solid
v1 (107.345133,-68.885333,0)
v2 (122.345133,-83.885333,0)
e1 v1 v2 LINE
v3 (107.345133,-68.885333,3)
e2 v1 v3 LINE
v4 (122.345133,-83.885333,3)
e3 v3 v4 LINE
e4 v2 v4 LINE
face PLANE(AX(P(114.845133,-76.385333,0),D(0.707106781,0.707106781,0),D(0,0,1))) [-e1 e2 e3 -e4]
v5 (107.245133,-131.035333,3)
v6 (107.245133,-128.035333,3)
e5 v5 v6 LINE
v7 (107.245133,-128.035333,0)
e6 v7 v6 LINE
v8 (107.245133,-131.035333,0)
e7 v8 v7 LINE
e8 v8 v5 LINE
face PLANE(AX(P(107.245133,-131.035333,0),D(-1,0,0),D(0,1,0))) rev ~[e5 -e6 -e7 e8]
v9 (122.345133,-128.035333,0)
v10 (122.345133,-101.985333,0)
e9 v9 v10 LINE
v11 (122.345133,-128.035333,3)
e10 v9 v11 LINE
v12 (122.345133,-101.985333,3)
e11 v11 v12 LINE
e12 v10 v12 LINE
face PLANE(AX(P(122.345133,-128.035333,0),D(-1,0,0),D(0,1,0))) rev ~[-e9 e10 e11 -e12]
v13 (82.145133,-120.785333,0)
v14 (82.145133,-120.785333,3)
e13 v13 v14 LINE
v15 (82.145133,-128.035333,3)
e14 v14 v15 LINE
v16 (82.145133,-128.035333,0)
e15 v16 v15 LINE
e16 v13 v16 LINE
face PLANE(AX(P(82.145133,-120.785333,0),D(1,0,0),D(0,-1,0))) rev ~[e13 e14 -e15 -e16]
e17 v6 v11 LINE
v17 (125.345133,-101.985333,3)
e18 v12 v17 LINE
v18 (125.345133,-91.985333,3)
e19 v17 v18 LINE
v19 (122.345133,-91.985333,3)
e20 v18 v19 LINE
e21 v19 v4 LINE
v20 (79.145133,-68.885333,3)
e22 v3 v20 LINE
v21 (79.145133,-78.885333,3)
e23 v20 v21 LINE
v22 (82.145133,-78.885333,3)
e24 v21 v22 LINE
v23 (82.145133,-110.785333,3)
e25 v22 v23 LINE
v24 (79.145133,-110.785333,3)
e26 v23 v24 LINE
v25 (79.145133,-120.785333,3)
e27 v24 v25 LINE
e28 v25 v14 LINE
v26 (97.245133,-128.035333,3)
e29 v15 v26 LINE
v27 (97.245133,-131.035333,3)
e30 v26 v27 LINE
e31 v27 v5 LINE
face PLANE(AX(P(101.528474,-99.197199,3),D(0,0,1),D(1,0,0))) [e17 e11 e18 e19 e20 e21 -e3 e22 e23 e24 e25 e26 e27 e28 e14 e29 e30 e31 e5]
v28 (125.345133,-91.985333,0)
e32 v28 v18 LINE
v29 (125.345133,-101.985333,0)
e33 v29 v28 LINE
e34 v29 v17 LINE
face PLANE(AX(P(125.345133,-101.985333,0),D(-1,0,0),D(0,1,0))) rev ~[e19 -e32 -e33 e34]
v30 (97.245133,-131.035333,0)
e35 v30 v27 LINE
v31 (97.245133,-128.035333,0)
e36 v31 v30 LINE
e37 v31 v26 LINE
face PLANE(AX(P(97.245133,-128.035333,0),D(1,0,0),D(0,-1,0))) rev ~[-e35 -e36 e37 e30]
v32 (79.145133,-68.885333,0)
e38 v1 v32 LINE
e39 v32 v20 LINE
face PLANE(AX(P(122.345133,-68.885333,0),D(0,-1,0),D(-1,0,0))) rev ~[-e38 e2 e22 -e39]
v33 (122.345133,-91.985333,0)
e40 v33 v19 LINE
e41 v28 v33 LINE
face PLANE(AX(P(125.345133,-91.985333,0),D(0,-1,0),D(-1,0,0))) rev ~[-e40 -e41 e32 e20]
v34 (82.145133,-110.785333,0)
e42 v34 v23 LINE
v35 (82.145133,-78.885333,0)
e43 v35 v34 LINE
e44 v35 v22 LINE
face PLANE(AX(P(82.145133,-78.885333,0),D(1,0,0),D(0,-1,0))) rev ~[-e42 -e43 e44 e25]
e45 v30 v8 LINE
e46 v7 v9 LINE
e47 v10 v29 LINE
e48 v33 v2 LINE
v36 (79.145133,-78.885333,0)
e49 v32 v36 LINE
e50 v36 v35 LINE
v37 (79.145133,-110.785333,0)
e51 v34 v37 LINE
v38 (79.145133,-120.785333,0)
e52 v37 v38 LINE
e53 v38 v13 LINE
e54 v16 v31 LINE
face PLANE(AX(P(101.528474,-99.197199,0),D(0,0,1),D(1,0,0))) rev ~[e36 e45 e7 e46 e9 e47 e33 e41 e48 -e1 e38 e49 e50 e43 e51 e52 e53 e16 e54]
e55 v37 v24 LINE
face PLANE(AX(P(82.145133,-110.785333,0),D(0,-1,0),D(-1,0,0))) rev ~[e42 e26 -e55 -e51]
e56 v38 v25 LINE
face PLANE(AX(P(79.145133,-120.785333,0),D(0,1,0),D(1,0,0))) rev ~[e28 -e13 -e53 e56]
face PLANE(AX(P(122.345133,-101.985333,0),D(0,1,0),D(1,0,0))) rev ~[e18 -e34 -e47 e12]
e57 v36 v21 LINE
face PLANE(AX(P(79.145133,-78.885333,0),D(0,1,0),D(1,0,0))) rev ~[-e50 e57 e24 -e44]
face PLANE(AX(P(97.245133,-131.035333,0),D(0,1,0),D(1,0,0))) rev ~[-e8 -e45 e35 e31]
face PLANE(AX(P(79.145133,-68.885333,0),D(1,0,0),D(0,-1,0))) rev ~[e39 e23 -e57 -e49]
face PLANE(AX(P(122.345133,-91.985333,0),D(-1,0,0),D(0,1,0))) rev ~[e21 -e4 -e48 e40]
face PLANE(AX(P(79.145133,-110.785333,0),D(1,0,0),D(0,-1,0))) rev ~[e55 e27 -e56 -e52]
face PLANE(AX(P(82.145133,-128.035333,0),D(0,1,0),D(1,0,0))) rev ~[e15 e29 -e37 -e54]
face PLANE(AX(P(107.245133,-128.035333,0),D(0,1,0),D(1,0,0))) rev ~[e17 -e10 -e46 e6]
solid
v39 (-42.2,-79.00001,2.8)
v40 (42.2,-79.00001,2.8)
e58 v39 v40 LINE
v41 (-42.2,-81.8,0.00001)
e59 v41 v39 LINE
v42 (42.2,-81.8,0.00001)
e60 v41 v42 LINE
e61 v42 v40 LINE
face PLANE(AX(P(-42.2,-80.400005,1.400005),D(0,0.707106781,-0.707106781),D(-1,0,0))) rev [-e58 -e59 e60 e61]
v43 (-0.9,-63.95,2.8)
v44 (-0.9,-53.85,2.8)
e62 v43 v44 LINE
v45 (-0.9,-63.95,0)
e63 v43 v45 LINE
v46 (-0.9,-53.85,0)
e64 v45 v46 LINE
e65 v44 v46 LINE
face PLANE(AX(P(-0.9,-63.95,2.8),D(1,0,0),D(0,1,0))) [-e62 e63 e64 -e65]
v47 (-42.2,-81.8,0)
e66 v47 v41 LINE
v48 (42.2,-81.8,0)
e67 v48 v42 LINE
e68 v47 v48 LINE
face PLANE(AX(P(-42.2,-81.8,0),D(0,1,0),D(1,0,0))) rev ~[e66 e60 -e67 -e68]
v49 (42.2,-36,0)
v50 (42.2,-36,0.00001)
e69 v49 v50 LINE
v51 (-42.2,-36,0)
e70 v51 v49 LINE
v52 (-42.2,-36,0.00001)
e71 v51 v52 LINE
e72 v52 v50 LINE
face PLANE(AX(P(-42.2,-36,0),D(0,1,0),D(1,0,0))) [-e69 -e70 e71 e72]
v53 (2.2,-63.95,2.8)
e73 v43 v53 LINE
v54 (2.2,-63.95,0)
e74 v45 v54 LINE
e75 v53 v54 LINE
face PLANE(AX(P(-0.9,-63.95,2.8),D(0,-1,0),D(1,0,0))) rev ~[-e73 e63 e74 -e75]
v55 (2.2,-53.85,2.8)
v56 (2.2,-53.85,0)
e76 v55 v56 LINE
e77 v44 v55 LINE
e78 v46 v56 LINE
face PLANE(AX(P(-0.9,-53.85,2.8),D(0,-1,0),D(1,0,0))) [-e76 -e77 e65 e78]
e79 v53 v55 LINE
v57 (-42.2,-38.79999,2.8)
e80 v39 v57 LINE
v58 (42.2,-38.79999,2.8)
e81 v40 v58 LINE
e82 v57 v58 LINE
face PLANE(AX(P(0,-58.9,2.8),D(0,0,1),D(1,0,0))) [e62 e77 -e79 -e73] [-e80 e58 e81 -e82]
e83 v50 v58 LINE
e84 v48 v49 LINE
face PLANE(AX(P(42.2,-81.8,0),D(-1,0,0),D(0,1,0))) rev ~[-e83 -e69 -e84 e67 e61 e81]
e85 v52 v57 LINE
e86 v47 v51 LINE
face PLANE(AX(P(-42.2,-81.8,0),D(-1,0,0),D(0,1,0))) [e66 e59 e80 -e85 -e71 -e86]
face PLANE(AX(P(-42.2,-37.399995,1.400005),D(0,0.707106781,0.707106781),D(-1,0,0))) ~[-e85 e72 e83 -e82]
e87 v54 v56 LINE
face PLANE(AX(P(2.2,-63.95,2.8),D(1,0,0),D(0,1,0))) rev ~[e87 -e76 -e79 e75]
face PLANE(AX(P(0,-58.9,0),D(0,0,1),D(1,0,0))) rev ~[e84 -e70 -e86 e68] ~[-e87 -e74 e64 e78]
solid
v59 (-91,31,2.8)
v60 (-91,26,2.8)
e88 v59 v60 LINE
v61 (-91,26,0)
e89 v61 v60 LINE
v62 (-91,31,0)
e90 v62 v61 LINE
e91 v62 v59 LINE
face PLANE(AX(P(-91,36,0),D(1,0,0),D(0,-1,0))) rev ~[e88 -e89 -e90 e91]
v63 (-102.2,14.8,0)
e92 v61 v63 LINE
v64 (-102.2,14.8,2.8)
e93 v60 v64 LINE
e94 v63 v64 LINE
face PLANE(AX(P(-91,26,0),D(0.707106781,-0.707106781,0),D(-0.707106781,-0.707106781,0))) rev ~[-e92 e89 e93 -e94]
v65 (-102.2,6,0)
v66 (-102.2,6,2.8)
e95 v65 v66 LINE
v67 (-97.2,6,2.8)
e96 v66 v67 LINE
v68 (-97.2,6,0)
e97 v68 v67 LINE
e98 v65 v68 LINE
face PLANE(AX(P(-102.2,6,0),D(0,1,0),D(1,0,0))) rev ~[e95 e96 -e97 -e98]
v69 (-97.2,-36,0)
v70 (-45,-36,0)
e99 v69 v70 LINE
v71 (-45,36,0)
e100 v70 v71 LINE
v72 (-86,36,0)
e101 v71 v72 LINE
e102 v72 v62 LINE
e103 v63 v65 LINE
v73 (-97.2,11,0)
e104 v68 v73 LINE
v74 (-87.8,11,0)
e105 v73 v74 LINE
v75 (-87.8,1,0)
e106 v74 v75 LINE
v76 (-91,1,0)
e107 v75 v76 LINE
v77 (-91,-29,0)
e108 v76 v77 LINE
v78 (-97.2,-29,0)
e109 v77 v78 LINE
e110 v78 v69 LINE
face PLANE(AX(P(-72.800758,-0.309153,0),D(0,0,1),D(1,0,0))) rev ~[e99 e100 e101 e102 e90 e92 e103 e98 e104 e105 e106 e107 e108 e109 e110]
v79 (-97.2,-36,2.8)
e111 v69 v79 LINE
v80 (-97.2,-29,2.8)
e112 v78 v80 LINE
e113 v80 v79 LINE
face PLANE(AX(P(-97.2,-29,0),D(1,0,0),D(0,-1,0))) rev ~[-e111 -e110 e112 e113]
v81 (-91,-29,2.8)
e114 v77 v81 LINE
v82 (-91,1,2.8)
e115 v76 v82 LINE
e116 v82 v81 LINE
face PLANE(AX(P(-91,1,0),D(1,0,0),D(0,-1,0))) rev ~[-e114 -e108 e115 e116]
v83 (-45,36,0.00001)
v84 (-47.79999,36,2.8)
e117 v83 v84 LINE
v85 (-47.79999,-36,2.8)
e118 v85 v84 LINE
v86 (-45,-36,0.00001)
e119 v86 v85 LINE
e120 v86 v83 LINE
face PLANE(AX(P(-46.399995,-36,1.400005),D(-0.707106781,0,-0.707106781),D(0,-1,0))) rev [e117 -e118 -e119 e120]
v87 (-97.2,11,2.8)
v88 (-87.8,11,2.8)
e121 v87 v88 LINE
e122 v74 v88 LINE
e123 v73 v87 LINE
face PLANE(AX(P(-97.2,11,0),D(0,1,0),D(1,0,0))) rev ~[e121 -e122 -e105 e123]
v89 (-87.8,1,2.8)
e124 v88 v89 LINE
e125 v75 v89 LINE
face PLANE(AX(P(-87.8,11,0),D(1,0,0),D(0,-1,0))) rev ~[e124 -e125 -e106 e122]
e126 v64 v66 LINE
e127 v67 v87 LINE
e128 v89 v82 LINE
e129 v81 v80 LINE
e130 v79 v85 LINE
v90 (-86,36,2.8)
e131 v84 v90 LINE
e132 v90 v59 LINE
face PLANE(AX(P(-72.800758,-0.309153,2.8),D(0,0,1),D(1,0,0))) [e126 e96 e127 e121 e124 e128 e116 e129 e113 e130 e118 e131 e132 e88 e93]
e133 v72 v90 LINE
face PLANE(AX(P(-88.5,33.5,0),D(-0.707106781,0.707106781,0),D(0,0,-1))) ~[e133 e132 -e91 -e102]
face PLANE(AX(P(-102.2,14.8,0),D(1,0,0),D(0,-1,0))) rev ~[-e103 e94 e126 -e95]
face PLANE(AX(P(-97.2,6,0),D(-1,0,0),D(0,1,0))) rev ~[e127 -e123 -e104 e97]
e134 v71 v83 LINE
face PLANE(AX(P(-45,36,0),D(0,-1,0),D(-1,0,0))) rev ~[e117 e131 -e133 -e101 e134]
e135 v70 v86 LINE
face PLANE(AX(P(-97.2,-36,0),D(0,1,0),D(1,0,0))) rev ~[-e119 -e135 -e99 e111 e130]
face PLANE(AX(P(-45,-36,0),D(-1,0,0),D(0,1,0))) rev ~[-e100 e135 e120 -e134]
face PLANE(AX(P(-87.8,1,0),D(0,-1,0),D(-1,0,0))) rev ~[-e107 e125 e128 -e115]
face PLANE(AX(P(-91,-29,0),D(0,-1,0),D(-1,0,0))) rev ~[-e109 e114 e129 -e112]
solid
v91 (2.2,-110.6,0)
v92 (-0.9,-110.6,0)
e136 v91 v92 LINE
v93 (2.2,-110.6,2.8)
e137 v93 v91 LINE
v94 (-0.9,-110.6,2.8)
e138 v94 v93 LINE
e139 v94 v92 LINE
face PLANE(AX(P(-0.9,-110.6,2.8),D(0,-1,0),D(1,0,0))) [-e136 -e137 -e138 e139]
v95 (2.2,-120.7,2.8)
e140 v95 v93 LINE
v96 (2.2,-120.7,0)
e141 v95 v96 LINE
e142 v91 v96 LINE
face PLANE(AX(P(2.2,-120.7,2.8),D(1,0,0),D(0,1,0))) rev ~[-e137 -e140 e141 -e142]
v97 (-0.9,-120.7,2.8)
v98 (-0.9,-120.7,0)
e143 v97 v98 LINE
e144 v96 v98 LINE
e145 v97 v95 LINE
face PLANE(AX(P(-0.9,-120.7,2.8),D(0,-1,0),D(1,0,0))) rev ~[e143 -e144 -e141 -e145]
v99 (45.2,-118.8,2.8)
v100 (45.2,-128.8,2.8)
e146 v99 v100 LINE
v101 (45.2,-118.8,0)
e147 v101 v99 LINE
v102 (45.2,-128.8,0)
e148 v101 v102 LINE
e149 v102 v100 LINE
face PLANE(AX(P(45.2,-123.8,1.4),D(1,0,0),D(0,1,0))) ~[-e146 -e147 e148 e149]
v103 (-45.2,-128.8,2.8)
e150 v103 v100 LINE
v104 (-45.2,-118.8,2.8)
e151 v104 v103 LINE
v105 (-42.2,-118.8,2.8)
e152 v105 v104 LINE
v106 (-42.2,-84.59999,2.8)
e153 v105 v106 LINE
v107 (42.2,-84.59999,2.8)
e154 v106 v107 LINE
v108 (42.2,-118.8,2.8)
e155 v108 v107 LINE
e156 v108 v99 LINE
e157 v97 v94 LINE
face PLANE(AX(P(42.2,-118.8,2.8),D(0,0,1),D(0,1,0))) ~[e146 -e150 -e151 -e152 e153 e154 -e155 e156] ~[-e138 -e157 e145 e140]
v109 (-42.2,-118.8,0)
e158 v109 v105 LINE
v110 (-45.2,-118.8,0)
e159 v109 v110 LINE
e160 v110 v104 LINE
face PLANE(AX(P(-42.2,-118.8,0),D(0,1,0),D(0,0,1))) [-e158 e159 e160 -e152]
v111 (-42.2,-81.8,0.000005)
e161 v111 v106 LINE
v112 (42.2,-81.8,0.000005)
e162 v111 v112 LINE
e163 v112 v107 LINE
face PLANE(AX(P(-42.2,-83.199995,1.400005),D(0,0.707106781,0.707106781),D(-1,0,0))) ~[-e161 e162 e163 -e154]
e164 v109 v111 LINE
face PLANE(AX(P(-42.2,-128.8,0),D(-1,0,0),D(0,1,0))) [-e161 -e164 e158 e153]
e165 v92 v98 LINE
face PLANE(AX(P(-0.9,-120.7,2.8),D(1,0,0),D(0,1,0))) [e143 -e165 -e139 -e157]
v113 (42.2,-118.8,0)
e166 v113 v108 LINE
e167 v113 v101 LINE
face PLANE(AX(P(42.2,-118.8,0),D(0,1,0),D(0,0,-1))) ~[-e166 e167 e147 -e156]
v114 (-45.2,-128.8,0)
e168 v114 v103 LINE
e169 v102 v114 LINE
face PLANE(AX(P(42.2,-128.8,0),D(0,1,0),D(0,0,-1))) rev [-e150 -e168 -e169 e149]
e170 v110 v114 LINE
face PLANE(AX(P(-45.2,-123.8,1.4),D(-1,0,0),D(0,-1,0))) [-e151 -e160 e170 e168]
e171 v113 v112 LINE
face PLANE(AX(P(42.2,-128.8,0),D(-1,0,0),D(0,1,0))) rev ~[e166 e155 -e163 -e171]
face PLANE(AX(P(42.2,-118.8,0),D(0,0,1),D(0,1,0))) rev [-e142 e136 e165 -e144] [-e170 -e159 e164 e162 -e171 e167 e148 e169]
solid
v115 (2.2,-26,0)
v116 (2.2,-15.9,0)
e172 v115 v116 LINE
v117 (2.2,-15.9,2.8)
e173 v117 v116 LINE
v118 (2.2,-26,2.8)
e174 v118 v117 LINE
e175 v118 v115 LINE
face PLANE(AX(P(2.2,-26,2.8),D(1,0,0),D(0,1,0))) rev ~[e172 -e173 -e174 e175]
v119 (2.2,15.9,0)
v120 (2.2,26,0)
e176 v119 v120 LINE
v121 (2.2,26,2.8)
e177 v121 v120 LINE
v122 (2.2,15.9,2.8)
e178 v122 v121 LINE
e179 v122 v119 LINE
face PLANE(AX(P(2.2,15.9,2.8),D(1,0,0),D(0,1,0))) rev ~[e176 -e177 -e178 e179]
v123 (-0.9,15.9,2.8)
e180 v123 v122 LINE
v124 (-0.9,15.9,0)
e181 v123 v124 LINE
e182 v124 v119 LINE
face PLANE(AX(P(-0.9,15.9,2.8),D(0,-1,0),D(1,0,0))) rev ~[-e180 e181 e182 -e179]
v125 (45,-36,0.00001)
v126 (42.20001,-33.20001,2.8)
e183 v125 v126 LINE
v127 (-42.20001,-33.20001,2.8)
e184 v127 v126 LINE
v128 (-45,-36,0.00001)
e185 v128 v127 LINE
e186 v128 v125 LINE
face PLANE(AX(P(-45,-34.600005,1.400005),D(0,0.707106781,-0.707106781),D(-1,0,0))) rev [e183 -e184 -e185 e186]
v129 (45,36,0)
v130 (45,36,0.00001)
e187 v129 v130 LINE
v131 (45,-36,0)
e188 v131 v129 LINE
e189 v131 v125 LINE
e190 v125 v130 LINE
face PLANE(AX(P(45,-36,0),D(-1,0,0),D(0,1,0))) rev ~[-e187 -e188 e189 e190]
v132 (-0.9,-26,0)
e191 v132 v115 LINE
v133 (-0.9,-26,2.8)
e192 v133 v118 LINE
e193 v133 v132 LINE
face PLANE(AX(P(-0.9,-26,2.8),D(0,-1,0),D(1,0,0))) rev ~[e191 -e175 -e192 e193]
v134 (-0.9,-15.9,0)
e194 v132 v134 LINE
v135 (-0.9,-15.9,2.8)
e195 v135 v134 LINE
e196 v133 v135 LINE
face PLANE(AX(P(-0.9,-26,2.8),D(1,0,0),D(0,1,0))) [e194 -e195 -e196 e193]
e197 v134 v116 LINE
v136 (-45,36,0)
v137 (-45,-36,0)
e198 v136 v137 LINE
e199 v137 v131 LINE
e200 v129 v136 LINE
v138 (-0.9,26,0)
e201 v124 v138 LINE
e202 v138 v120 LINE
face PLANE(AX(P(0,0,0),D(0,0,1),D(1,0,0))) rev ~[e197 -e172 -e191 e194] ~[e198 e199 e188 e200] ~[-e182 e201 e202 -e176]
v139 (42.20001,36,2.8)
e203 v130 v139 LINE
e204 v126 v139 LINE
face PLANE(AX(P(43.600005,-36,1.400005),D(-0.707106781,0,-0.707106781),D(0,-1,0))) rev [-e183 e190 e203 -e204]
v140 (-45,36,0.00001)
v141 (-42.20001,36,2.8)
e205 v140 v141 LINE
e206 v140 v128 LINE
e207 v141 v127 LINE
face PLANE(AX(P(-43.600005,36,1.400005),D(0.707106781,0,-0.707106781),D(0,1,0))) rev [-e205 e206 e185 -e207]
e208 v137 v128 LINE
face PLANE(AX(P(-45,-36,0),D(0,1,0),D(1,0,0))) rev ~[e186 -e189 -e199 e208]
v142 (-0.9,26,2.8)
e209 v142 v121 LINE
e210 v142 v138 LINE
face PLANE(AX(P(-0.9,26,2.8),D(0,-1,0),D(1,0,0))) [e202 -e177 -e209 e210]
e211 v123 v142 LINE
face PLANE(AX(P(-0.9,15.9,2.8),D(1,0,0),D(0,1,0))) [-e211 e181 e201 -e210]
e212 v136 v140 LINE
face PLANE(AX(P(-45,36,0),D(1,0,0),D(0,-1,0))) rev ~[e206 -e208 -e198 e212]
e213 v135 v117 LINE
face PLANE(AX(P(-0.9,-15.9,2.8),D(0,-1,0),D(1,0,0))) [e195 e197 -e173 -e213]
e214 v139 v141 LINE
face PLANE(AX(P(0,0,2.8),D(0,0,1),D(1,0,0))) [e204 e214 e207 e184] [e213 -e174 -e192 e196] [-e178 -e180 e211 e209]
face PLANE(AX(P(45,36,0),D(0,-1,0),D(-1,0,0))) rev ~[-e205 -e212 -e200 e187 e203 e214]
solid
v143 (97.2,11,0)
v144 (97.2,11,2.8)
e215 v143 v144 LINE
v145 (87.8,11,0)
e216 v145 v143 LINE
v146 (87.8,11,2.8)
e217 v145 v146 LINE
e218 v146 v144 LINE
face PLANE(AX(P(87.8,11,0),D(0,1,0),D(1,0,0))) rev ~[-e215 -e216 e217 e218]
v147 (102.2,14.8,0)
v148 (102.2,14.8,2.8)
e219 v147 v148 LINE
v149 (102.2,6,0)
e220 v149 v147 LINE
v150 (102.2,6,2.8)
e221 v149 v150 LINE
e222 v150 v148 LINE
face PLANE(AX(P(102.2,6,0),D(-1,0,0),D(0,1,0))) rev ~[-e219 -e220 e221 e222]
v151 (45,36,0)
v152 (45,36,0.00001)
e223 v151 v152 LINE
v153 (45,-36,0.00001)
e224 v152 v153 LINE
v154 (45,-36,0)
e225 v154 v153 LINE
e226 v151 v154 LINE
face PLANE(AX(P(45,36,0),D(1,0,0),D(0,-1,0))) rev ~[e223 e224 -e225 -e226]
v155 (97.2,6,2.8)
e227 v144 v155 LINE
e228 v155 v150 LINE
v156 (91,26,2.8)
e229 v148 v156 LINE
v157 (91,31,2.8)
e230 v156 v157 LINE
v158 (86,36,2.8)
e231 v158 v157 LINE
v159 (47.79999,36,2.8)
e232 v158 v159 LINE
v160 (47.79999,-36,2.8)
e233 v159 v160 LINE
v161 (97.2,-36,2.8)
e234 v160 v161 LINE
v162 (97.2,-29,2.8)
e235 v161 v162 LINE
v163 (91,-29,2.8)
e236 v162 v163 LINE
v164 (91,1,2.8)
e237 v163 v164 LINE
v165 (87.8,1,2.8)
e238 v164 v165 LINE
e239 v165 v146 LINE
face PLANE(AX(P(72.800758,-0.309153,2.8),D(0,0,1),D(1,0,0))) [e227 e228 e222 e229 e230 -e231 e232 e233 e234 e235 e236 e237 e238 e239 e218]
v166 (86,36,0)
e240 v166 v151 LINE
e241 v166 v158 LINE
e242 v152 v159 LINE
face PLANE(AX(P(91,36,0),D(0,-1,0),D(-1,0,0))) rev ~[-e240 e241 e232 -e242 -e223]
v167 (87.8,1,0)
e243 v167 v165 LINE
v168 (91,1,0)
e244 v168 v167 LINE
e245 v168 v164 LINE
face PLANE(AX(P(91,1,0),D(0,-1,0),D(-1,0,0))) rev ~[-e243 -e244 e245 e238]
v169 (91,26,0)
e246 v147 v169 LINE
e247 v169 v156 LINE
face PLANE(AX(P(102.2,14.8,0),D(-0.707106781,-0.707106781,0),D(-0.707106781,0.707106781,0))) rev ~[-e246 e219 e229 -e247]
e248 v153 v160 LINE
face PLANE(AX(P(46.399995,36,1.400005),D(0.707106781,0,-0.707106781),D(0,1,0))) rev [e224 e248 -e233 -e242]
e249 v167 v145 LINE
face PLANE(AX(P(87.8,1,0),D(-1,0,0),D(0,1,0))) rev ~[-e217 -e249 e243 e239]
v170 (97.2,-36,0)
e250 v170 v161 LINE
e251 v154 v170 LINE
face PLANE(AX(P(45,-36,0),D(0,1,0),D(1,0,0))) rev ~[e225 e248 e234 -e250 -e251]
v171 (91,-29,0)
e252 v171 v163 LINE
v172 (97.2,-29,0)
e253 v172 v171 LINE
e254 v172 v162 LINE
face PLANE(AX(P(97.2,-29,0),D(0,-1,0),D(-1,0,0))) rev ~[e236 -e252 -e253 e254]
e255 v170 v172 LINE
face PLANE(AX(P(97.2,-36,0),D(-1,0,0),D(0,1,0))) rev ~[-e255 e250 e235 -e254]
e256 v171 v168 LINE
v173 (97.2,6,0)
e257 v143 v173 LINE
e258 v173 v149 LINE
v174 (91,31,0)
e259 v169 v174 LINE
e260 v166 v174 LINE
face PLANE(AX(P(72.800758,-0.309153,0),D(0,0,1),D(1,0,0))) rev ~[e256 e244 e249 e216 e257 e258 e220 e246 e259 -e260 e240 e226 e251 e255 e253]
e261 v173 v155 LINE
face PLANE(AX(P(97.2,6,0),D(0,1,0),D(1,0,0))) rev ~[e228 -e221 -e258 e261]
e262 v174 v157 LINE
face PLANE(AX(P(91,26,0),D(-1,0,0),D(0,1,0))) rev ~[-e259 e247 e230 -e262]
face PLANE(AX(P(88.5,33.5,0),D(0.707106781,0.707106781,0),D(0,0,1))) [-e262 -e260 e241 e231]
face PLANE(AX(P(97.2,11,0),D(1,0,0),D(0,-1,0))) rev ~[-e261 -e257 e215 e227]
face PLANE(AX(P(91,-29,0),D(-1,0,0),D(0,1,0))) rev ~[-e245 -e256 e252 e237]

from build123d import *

# Parameters (mm, degrees)
F1_DEPTH   = 2.8
F2_SIZE    = 2.79999
F2_2_SIZE  = 2.79999
F3_DEPTH   = 2.8
F4_SIZE    = 2.79999
F5_W       = 3.1
F5_H       = 10.1
F6_DEPTH   = 3
F0_W       = 84.4
F0_H       = 45.8
F7_DEPTH   = 2.8
F8_SIZE    = 2.79999
F0_H_2     = 47
F9_DEPTH   = 2.8
F10_SIZE   = 2.79999
F11_W      = 10
F11_H      = 2.8
F12_DEPTH  = 3
F15_W      = 3.1
F15_H      = 10.1
F14_W      = 3.1
F14_H      = 10.1
F16_DEPTH  = 4
F18_DEPTH  = 3
F19_SIZE   = 5
F19_2_SIZE = 5
F20_SIZE   = 15


# Not quite as in the source:
# - a fillet or chamfer is up to 0.001 mm smaller than in the source, because OpenCascade refuses the exact size


with BuildPart() as f1:
    # F0 (on Top) → F1 (new body)
    with BuildSketch(Plane.XY):
        Polygon((-45, -36), (-45, 36), (-91, 36), (-91, 26), (-102.2, 14.8), (-102.2, 6), (-97.2, 6), (-97.2, 11), (-91, 11), (-87.8, 11), (-87.8, 1), (-91, 1), (-91, -29), (-97.2, -29), (-97.2, -36), (-91, -36), align=None)
    extrude(amount=F1_DEPTH)

    # F2 (size 2.8 in the source; OpenCascade refuses exactly that, so slightly less here)
    f2_edges = [f1.edges().sort_by_distance(p)[0] for p in [
        (-45, 0, 2.8),
    ]]
    chamfer(f2_edges, length=F2_SIZE)

    # F19
    f19_edges = [f1.edges().sort_by_distance(p)[0] for p in [
        (-91, 36, 1.4),
    ]]
    chamfer(f19_edges, length=F19_SIZE)


with BuildPart() as f1b:
    # F0 (on Top) → F1, piece 2 (new body)
    with BuildSketch(Plane.XY):
        Polygon((45, 36), (45, -36), (91, -36), (97.2, -36), (97.2, -29), (91, -29), (91, 1), (87.8, 1), (87.8, 11), (91, 11), (97.2, 11), (97.2, 6), (102.2, 6), (102.2, 14.8), (91, 26), (91, 36), align=None)
    extrude(amount=F1_DEPTH)

    # F2#2 (size 2.8 in the source; OpenCascade refuses exactly that, so slightly less here)
    f2_2_edges = [f1b.edges().sort_by_distance(p)[0] for p in [
        (45, 0, 2.8),
    ]]
    chamfer(f2_2_edges, length=F2_2_SIZE)

    # F19#2
    f19_2_edges = [f1b.edges().sort_by_distance(p)[0] for p in [
        (91, 36, 1.4),
    ]]
    chamfer(f19_2_edges, length=F19_2_SIZE)


with BuildPart() as f3:
    # F0 (on Top) → F3 (new body)
    with BuildSketch(Plane.XY):
        Polygon((42.2, -36), (45, -36), (45, 36), (-45, 36), (-45, -36), (-42.2, -36), align=None)
    extrude(amount=F3_DEPTH)

    # F4 (size 2.8 in the source; OpenCascade refuses exactly that, so slightly less here)
    f4_edges = [f3.edges().sort_by_distance(p)[0] for p in [
        (45, 0, 2.8),
        (-45, 0, 2.8),
        (0, -36, 2.8),
    ]]
    chamfer(f4_edges, length=F4_SIZE)

    # F5 (on face) → F6 (cut)
    with BuildSketch(Plane.XY.offset(2.8)):
        with Locations((0.65, 20.95)):
            Rectangle(F5_W, F5_H)
        with Locations((0.65, -20.95)):
            Rectangle(F5_W, F5_H)
    extrude(amount=-F6_DEPTH, mode=Mode.SUBTRACT)


with BuildPart() as f7:
    # F0 (on Top) → F7 (new body)
    with BuildSketch(Plane.XY):
        with Locations((0, -58.9)):
            Rectangle(F0_W, F0_H)
    extrude(amount=F7_DEPTH)

    # F8 (size 2.8 in the source; OpenCascade refuses exactly that, so slightly less here)
    f8_edges = [f7.edges().sort_by_distance(p)[0] for p in [
        (0, -36, 2.8),
        (0, -81.8, 2.8),
    ]]
    chamfer(f8_edges, length=F8_SIZE)


with BuildPart() as f9:
    # F0 (on Top) → F9 (new body)
    with BuildSketch(Plane.XY):
        with Locations((0, -105.3)):
            Rectangle(F0_W, F0_H_2)
    extrude(amount=F9_DEPTH)

    # F10 (size 2.8 in the source; OpenCascade refuses exactly that, so slightly less here)
    f10_edges = [f9.edges().sort_by_distance(p)[0] for p in [
        (0, -81.8, 2.8),
    ]]
    chamfer(f10_edges, length=F10_SIZE)

    # F11 (on face) → F12 (join)
    with BuildSketch(Plane(origin=(-42.2, 0, 0), x_dir=(0, -1, 0), z_dir=(-1, 0, 0))):
        with Locations((123.8, 1.4)):
            Rectangle(F11_W, F11_H)
    extrude(amount=F12_DEPTH)

    # F13: F9 across plane


with BuildPart() as f9_1:
    add(f9.part)
    add(f9.part.mirror(Plane.YZ))


with BuildPart() as f16_tool:
    # F15 (on face) + F14 (on face) → F16 (new body)
    with BuildSketch(Plane.XY.offset(2.8)):
        with Locations((0.65, -115.65)):
            Rectangle(F15_W, F15_H)
    with BuildSketch(Plane.XY.offset(2.8)):
        with Locations((0.65, -58.9)):
            Rectangle(F14_W, F14_H)
    extrude(amount=-F16_DEPTH)


with BuildPart() as f7_1:
    add(f7.part)

    # F16: cut by f16_tool
    add(f16_tool.part, mode=Mode.SUBTRACT)


with BuildPart() as f9_2:
    add(f9_1.part)

    # F16: cut by f16_tool
    add(f16_tool.part, mode=Mode.SUBTRACT)


with BuildPart() as f18:
    # F17 (on Top) → F18 (new body)
    with BuildSketch(Plane.XY):
        Polygon((122.3451334953, -68.8853332162), (82.1451334953, -68.8853332162), (79.1451334953, -68.8853332162), (79.1451334953, -78.8853332162), (82.1451334953, -78.8853332162), (82.1451334953, -110.7853332162), (79.1451334953, -110.7853332162), (79.1451334953, -120.7853332162), (82.1451334953, -120.7853332162), (82.1451334953, -128.0353332162), (97.2451334953, -128.0353332162), (97.2451334953, -131.0353332162), (102.2451334953, -131.0353332162), (107.2451334953, -131.0353332162), (107.2451334953, -128.0353332162), (122.3451334953, -128.0353332162), (122.3451334953, -101.9853332162), (125.3451334953, -101.9853332162), (125.3451334953, -91.9853332162), (122.3451334953, -91.9853332162), align=None)
    extrude(amount=F18_DEPTH)

    # F20
    f20_edges = [f18.edges().sort_by_distance(p)[0] for p in [
        (122.345133, -68.885333, 1.5),
    ]]
    chamfer(f20_edges, length=F20_SIZE)


solid = Compound([f1.part, f1b.part, f3.part, f7_1.part, f9_2.part, f18.part])
